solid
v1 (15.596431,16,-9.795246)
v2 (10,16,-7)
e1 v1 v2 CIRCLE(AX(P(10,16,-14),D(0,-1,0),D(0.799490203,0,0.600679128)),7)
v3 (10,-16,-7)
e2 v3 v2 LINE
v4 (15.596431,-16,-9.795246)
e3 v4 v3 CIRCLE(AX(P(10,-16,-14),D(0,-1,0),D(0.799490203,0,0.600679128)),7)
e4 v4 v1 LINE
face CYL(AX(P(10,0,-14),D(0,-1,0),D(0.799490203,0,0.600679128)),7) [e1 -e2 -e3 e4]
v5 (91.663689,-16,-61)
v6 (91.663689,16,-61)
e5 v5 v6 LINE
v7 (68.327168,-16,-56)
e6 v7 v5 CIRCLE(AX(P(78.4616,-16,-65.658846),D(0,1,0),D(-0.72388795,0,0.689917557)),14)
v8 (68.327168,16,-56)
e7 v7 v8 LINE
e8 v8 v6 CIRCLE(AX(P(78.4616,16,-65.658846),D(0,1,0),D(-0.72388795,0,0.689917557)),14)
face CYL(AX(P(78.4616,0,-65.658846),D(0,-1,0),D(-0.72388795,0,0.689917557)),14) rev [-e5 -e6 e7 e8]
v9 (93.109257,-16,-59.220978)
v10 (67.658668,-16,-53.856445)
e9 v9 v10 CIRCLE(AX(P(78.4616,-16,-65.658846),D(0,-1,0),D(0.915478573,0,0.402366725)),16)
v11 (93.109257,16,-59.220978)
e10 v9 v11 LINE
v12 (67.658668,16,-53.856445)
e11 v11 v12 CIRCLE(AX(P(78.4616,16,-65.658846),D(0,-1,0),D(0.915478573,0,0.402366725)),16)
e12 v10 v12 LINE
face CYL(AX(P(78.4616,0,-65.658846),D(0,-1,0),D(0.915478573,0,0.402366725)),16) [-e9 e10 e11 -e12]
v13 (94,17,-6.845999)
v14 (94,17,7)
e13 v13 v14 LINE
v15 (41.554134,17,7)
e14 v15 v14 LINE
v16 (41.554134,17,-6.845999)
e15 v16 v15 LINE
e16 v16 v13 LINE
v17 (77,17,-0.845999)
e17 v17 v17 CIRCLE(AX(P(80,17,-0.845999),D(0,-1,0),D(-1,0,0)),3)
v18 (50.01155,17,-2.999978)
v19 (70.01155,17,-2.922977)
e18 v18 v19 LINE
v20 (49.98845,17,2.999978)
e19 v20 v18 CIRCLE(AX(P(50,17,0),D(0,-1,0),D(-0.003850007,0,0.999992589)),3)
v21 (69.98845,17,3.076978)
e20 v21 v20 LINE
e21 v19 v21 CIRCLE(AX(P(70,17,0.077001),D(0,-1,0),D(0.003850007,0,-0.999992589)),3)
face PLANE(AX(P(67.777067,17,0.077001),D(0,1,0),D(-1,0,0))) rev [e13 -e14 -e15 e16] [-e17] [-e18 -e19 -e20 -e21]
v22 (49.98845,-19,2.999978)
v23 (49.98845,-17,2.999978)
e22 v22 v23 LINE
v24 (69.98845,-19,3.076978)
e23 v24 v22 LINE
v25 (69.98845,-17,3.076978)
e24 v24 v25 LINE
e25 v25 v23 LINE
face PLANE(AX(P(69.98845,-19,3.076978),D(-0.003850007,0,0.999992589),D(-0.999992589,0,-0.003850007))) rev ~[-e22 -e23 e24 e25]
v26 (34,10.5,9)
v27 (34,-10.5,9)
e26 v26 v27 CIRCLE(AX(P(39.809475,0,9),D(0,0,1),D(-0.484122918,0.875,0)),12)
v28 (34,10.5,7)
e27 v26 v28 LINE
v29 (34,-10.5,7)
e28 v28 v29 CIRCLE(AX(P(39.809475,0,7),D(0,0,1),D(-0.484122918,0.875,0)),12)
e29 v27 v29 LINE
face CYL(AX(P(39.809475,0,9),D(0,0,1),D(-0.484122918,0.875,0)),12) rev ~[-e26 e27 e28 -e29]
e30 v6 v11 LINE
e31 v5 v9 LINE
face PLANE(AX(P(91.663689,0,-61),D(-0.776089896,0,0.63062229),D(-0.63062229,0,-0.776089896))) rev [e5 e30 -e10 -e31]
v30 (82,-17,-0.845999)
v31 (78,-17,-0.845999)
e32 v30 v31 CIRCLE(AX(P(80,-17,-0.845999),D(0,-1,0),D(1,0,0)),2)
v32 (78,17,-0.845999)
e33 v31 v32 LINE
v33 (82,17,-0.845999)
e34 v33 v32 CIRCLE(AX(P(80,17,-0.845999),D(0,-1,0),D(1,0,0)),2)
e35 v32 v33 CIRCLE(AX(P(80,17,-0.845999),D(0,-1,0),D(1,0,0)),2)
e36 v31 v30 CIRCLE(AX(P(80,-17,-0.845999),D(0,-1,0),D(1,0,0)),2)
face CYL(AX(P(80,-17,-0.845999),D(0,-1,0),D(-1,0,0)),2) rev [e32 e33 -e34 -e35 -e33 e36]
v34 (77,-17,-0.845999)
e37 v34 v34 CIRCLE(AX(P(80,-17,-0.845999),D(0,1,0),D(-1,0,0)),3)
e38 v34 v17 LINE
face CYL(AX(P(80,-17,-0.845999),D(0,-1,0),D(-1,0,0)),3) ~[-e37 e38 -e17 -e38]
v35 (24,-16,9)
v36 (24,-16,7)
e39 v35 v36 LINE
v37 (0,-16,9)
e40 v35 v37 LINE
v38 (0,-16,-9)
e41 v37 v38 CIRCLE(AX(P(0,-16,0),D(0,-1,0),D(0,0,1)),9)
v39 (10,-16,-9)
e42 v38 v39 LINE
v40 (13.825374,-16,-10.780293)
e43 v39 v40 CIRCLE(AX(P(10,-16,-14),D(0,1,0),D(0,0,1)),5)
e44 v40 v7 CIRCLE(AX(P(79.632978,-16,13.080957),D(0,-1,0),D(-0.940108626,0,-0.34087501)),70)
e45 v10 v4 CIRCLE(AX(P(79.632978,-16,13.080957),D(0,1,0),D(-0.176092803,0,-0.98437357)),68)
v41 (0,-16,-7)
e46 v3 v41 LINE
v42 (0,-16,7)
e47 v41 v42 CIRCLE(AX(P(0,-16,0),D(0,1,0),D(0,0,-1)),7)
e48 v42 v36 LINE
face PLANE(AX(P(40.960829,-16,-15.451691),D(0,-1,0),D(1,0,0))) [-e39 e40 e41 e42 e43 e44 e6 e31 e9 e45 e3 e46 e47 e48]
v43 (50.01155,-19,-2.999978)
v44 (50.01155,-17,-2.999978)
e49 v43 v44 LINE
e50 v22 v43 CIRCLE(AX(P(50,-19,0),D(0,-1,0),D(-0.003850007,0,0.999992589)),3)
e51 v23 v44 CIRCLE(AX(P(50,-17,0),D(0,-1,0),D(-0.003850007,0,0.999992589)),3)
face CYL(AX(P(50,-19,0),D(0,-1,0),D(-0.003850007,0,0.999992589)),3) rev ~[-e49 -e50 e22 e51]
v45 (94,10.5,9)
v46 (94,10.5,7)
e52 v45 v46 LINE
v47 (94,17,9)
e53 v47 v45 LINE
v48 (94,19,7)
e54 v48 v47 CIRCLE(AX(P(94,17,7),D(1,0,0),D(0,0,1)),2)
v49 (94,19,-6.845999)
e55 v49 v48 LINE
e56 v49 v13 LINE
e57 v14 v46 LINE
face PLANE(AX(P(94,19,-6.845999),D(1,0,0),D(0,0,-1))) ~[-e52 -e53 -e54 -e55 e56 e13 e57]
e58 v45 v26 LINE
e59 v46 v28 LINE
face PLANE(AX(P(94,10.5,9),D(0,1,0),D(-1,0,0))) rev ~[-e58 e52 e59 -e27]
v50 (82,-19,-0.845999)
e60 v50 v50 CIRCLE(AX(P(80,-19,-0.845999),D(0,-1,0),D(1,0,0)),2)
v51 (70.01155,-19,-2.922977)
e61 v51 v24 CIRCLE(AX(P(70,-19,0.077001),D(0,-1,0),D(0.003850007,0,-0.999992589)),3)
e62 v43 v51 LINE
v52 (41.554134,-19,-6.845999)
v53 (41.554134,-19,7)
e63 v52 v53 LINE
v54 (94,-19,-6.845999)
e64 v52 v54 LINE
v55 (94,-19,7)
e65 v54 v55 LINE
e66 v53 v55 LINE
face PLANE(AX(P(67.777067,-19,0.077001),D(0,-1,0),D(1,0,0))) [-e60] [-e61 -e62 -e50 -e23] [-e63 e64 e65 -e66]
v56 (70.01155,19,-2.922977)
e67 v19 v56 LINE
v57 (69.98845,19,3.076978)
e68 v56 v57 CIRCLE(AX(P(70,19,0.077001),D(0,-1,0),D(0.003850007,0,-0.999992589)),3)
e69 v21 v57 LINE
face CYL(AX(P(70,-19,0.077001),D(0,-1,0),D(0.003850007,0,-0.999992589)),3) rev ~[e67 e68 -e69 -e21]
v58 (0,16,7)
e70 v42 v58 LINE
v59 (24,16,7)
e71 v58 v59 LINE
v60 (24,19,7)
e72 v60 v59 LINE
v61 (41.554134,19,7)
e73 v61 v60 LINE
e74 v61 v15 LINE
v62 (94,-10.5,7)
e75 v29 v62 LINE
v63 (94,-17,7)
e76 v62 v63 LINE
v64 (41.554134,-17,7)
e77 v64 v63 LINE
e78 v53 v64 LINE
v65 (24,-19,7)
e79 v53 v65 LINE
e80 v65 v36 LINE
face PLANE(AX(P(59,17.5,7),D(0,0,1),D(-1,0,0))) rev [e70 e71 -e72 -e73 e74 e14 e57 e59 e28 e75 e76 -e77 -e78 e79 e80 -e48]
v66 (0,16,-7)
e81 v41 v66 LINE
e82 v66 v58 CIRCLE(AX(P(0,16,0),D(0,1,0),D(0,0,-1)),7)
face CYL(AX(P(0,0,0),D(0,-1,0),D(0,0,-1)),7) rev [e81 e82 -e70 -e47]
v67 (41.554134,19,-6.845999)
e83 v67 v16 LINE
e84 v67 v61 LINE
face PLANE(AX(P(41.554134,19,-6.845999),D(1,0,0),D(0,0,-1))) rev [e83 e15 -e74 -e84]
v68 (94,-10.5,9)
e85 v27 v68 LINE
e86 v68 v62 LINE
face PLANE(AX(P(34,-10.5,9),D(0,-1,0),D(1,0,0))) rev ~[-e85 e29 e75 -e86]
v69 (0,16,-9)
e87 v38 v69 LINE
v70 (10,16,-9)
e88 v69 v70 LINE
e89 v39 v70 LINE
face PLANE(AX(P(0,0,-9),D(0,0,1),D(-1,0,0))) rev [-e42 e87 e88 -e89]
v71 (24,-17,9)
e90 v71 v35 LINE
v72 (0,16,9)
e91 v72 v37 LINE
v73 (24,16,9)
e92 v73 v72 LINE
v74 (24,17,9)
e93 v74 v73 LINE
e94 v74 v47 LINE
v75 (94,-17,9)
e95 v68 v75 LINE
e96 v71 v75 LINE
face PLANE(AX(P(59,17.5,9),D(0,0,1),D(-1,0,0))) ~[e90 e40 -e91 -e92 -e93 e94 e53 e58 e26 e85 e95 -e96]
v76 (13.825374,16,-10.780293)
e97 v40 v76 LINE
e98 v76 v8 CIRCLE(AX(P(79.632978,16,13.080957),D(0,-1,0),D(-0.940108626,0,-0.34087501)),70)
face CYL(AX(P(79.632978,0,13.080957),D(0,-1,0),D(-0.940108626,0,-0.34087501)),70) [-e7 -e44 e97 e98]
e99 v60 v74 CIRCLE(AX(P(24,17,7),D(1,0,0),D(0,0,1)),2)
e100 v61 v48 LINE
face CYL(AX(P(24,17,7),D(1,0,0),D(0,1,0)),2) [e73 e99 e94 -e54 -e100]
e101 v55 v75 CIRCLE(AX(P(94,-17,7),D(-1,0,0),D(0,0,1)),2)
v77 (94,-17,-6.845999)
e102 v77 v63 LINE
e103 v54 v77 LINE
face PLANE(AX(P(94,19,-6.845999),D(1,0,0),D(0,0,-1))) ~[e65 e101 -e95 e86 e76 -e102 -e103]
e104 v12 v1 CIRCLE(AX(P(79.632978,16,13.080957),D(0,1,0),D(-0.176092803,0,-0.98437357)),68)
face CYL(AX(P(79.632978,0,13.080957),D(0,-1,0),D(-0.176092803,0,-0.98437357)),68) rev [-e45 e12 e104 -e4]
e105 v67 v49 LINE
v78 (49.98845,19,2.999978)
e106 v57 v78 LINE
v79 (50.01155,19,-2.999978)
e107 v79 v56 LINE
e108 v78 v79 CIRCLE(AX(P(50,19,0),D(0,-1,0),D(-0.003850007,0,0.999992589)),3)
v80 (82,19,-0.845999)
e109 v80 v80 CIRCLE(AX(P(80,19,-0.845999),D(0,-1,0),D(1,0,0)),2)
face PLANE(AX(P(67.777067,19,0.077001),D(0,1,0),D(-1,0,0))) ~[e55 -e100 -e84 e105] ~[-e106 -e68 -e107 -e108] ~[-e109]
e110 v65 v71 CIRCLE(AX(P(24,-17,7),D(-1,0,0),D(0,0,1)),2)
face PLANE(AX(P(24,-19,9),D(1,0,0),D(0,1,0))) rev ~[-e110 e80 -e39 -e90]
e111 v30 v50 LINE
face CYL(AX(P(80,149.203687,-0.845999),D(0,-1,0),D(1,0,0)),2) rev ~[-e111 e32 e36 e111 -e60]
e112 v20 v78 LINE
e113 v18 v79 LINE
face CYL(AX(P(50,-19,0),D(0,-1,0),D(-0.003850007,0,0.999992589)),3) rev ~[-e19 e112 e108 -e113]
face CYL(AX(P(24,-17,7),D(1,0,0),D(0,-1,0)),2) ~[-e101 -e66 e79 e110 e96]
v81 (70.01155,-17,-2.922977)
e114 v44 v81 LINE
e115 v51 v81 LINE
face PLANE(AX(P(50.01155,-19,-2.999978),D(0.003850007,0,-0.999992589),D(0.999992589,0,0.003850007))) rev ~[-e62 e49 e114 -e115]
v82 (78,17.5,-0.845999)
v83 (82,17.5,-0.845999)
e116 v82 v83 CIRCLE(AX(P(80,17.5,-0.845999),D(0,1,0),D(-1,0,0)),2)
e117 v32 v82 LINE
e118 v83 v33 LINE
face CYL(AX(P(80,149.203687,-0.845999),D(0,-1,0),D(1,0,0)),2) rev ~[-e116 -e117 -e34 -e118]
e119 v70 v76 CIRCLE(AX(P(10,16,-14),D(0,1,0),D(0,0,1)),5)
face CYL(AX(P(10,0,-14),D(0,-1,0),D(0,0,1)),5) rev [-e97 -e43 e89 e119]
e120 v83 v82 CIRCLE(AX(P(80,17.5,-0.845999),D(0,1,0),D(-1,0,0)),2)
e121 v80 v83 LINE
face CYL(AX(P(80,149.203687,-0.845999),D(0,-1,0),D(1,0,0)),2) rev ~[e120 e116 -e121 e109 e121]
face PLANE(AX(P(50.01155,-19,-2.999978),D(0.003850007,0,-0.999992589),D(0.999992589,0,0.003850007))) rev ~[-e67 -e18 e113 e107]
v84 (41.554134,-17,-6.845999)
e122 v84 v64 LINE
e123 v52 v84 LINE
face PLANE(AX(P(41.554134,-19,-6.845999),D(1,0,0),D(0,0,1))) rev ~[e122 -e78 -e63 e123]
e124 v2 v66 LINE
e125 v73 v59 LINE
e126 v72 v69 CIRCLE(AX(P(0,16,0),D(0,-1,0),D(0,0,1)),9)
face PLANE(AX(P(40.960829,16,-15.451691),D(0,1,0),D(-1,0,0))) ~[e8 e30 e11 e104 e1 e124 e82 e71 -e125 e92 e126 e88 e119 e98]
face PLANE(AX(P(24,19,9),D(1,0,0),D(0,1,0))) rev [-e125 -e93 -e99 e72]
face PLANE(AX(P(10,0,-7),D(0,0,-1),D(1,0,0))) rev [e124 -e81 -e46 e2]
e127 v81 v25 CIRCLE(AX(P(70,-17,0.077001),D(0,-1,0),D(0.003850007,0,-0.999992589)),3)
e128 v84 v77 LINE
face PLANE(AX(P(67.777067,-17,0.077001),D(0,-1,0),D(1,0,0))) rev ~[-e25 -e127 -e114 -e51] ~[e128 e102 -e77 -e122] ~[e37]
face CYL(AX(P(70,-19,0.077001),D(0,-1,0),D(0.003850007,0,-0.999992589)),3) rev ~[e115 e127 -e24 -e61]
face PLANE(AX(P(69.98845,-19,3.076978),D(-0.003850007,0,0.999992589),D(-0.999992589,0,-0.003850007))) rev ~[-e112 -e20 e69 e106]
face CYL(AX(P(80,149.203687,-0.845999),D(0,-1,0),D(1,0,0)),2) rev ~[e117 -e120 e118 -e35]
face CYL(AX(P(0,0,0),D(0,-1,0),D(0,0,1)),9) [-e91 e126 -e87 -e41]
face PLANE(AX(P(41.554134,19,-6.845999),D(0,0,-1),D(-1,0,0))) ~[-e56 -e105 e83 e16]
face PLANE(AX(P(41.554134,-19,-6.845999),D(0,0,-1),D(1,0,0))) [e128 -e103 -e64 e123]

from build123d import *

# Parameters (mm, degrees)
F1_DEPTH  = 16
F2_W      = 70
F2_H      = 3
F3_DEPTH  = 2
F4_W      = 52.4458656609
F4_H      = 13.8459985778
F5_DEPTH  = 2
F8_DEPTH  = 2
F9_R      = 2
F11_DEPTH = 38.001
F13_D     = 4
F14_R     = 3
F14_R_2   = 2
F15_DEPTH = 34.5


with BuildPart() as f1:
    # F0 (on Front) → F1 (new body)
    with BuildSketch(Plane.XZ):
        with BuildLine():
            Line((94, 9), (0, 9))
            ThreePointArc((0, 9), (-9, 0), (0, -9))
            Line((0, -9), (10, -9))
            ThreePointArc((10, -9), (12.1096761181, -9.4668701015), (13.8253743549, -10.7802933293))
            ThreePointArc((13.8253743549, -10.7802933293), (34.9359413113, -40.7908803671), (68.327168476, -56))
            ThreePointArc((68.327168476, -56), (81.3946239912, -51.9695299334), (91.6636888451, -61))
            Line((91.6636888451, -61), (93.1092569516, -59.2209782))
            ThreePointArc((93.1092569516, -59.2209782), (81.7616044026, -50.0028575081), (67.6586675506, -53.8564453964))
            ThreePointArc((67.6586675506, -53.8564453964), (35.7039452814, -38.8251123565), (15.5964314226, -9.7952461033))
            ThreePointArc((15.5964314226, -9.7952461033), (13.1278365305, -7.7376810494), (10, -7))
            Line((10, -7), (0, -7))
            ThreePointArc((0, -7), (-7, 0), (0, 7))
            Line((0, 7), (94, 7))
            Line((94, 7), (94, 9))
        make_face()
    extrude(amount=F1_DEPTH)

    # F2 (on face) → F3 (join)
    with BuildSketch(Plane.XY.offset(9)):
        with Locations((59, -17.5)):
            Rectangle(F2_W, F2_H)
    extrude(amount=-F3_DEPTH)

    # F4 (on face) → F5 (join)
    with BuildSketch(Plane.XZ.offset(19)):
        with Locations((67.7770671695, 0.0770007111)):
            Rectangle(F4_W, F4_H)
    extrude(amount=-F5_DEPTH)

    # F6: F1 across face


with BuildPart() as f1_1:
    add(f1.part)
    add(f1.part.mirror(Plane(origin=(40.1817011291, 0, -15.4832521129), x_dir=(1, 0, 0), z_dir=(0, 1, 0))))

    # F7 (on face) → F8 (cut)
    with BuildSketch(Plane.XY.offset(9)):
        with BuildLine():
            Line((34, -10.5), (94, -10.5))
            Line((94, -10.5), (94, 10.5))
            Line((94, 10.5), (34, 10.5))
            ThreePointArc((34, 10.5), (27.8094750193, 0), (34, -10.5))
        make_face()
    extrude(amount=-F8_DEPTH, mode=Mode.SUBTRACT)

    # F9
    f9_edges = [f1_1.edges().sort_by_distance(p)[0] for p in [
        (59, -19, 9),
        (59, 19, 9),
    ]]
    fillet(f9_edges, radius=F9_R)

    # F10 (on face) → F11 (cut, through all)
    with BuildSketch(Plane.XZ.offset(19)):
        with BuildLine():
            ThreePointArc((70.0115500211, -2.922977055), (72.9999777661, 0.0885507322), (69.9884499789, 3.0769784772))
            Line((69.9884499789, 3.0769784772), (49.9884499789, 2.9999777661))
            ThreePointArc((49.9884499789, 2.9999777661), (47.0000222339, -0.0115500211), (50.0115500211, -2.9999777661))
            Line((50.0115500211, -2.9999777661), (70.0115500211, -2.922977055))
        make_face()
    extrude(amount=-F11_DEPTH, mode=Mode.SUBTRACT)

    # F13 (through all)
    with Locations(Plane(origin=(0, 19, 0), x_dir=(-1, 0, 0), z_dir=(0, 1, 0))):
        with Locations((-80, -0.8459985778)):
            Hole(F13_D / 2)

    # F14 (on face) → F15 (join)
    with BuildSketch(Plane(origin=(0, -17, 0), x_dir=(-1, 0, 0), z_dir=(0, 1, 0))):
        with Locations((-80, -0.8459985778)):
            Circle(F14_R)
        with Locations((-80, -0.8459985778)):
            Circle(F14_R_2, mode=Mode.SUBTRACT)
    extrude(amount=F15_DEPTH)


solid = f1_1.part
